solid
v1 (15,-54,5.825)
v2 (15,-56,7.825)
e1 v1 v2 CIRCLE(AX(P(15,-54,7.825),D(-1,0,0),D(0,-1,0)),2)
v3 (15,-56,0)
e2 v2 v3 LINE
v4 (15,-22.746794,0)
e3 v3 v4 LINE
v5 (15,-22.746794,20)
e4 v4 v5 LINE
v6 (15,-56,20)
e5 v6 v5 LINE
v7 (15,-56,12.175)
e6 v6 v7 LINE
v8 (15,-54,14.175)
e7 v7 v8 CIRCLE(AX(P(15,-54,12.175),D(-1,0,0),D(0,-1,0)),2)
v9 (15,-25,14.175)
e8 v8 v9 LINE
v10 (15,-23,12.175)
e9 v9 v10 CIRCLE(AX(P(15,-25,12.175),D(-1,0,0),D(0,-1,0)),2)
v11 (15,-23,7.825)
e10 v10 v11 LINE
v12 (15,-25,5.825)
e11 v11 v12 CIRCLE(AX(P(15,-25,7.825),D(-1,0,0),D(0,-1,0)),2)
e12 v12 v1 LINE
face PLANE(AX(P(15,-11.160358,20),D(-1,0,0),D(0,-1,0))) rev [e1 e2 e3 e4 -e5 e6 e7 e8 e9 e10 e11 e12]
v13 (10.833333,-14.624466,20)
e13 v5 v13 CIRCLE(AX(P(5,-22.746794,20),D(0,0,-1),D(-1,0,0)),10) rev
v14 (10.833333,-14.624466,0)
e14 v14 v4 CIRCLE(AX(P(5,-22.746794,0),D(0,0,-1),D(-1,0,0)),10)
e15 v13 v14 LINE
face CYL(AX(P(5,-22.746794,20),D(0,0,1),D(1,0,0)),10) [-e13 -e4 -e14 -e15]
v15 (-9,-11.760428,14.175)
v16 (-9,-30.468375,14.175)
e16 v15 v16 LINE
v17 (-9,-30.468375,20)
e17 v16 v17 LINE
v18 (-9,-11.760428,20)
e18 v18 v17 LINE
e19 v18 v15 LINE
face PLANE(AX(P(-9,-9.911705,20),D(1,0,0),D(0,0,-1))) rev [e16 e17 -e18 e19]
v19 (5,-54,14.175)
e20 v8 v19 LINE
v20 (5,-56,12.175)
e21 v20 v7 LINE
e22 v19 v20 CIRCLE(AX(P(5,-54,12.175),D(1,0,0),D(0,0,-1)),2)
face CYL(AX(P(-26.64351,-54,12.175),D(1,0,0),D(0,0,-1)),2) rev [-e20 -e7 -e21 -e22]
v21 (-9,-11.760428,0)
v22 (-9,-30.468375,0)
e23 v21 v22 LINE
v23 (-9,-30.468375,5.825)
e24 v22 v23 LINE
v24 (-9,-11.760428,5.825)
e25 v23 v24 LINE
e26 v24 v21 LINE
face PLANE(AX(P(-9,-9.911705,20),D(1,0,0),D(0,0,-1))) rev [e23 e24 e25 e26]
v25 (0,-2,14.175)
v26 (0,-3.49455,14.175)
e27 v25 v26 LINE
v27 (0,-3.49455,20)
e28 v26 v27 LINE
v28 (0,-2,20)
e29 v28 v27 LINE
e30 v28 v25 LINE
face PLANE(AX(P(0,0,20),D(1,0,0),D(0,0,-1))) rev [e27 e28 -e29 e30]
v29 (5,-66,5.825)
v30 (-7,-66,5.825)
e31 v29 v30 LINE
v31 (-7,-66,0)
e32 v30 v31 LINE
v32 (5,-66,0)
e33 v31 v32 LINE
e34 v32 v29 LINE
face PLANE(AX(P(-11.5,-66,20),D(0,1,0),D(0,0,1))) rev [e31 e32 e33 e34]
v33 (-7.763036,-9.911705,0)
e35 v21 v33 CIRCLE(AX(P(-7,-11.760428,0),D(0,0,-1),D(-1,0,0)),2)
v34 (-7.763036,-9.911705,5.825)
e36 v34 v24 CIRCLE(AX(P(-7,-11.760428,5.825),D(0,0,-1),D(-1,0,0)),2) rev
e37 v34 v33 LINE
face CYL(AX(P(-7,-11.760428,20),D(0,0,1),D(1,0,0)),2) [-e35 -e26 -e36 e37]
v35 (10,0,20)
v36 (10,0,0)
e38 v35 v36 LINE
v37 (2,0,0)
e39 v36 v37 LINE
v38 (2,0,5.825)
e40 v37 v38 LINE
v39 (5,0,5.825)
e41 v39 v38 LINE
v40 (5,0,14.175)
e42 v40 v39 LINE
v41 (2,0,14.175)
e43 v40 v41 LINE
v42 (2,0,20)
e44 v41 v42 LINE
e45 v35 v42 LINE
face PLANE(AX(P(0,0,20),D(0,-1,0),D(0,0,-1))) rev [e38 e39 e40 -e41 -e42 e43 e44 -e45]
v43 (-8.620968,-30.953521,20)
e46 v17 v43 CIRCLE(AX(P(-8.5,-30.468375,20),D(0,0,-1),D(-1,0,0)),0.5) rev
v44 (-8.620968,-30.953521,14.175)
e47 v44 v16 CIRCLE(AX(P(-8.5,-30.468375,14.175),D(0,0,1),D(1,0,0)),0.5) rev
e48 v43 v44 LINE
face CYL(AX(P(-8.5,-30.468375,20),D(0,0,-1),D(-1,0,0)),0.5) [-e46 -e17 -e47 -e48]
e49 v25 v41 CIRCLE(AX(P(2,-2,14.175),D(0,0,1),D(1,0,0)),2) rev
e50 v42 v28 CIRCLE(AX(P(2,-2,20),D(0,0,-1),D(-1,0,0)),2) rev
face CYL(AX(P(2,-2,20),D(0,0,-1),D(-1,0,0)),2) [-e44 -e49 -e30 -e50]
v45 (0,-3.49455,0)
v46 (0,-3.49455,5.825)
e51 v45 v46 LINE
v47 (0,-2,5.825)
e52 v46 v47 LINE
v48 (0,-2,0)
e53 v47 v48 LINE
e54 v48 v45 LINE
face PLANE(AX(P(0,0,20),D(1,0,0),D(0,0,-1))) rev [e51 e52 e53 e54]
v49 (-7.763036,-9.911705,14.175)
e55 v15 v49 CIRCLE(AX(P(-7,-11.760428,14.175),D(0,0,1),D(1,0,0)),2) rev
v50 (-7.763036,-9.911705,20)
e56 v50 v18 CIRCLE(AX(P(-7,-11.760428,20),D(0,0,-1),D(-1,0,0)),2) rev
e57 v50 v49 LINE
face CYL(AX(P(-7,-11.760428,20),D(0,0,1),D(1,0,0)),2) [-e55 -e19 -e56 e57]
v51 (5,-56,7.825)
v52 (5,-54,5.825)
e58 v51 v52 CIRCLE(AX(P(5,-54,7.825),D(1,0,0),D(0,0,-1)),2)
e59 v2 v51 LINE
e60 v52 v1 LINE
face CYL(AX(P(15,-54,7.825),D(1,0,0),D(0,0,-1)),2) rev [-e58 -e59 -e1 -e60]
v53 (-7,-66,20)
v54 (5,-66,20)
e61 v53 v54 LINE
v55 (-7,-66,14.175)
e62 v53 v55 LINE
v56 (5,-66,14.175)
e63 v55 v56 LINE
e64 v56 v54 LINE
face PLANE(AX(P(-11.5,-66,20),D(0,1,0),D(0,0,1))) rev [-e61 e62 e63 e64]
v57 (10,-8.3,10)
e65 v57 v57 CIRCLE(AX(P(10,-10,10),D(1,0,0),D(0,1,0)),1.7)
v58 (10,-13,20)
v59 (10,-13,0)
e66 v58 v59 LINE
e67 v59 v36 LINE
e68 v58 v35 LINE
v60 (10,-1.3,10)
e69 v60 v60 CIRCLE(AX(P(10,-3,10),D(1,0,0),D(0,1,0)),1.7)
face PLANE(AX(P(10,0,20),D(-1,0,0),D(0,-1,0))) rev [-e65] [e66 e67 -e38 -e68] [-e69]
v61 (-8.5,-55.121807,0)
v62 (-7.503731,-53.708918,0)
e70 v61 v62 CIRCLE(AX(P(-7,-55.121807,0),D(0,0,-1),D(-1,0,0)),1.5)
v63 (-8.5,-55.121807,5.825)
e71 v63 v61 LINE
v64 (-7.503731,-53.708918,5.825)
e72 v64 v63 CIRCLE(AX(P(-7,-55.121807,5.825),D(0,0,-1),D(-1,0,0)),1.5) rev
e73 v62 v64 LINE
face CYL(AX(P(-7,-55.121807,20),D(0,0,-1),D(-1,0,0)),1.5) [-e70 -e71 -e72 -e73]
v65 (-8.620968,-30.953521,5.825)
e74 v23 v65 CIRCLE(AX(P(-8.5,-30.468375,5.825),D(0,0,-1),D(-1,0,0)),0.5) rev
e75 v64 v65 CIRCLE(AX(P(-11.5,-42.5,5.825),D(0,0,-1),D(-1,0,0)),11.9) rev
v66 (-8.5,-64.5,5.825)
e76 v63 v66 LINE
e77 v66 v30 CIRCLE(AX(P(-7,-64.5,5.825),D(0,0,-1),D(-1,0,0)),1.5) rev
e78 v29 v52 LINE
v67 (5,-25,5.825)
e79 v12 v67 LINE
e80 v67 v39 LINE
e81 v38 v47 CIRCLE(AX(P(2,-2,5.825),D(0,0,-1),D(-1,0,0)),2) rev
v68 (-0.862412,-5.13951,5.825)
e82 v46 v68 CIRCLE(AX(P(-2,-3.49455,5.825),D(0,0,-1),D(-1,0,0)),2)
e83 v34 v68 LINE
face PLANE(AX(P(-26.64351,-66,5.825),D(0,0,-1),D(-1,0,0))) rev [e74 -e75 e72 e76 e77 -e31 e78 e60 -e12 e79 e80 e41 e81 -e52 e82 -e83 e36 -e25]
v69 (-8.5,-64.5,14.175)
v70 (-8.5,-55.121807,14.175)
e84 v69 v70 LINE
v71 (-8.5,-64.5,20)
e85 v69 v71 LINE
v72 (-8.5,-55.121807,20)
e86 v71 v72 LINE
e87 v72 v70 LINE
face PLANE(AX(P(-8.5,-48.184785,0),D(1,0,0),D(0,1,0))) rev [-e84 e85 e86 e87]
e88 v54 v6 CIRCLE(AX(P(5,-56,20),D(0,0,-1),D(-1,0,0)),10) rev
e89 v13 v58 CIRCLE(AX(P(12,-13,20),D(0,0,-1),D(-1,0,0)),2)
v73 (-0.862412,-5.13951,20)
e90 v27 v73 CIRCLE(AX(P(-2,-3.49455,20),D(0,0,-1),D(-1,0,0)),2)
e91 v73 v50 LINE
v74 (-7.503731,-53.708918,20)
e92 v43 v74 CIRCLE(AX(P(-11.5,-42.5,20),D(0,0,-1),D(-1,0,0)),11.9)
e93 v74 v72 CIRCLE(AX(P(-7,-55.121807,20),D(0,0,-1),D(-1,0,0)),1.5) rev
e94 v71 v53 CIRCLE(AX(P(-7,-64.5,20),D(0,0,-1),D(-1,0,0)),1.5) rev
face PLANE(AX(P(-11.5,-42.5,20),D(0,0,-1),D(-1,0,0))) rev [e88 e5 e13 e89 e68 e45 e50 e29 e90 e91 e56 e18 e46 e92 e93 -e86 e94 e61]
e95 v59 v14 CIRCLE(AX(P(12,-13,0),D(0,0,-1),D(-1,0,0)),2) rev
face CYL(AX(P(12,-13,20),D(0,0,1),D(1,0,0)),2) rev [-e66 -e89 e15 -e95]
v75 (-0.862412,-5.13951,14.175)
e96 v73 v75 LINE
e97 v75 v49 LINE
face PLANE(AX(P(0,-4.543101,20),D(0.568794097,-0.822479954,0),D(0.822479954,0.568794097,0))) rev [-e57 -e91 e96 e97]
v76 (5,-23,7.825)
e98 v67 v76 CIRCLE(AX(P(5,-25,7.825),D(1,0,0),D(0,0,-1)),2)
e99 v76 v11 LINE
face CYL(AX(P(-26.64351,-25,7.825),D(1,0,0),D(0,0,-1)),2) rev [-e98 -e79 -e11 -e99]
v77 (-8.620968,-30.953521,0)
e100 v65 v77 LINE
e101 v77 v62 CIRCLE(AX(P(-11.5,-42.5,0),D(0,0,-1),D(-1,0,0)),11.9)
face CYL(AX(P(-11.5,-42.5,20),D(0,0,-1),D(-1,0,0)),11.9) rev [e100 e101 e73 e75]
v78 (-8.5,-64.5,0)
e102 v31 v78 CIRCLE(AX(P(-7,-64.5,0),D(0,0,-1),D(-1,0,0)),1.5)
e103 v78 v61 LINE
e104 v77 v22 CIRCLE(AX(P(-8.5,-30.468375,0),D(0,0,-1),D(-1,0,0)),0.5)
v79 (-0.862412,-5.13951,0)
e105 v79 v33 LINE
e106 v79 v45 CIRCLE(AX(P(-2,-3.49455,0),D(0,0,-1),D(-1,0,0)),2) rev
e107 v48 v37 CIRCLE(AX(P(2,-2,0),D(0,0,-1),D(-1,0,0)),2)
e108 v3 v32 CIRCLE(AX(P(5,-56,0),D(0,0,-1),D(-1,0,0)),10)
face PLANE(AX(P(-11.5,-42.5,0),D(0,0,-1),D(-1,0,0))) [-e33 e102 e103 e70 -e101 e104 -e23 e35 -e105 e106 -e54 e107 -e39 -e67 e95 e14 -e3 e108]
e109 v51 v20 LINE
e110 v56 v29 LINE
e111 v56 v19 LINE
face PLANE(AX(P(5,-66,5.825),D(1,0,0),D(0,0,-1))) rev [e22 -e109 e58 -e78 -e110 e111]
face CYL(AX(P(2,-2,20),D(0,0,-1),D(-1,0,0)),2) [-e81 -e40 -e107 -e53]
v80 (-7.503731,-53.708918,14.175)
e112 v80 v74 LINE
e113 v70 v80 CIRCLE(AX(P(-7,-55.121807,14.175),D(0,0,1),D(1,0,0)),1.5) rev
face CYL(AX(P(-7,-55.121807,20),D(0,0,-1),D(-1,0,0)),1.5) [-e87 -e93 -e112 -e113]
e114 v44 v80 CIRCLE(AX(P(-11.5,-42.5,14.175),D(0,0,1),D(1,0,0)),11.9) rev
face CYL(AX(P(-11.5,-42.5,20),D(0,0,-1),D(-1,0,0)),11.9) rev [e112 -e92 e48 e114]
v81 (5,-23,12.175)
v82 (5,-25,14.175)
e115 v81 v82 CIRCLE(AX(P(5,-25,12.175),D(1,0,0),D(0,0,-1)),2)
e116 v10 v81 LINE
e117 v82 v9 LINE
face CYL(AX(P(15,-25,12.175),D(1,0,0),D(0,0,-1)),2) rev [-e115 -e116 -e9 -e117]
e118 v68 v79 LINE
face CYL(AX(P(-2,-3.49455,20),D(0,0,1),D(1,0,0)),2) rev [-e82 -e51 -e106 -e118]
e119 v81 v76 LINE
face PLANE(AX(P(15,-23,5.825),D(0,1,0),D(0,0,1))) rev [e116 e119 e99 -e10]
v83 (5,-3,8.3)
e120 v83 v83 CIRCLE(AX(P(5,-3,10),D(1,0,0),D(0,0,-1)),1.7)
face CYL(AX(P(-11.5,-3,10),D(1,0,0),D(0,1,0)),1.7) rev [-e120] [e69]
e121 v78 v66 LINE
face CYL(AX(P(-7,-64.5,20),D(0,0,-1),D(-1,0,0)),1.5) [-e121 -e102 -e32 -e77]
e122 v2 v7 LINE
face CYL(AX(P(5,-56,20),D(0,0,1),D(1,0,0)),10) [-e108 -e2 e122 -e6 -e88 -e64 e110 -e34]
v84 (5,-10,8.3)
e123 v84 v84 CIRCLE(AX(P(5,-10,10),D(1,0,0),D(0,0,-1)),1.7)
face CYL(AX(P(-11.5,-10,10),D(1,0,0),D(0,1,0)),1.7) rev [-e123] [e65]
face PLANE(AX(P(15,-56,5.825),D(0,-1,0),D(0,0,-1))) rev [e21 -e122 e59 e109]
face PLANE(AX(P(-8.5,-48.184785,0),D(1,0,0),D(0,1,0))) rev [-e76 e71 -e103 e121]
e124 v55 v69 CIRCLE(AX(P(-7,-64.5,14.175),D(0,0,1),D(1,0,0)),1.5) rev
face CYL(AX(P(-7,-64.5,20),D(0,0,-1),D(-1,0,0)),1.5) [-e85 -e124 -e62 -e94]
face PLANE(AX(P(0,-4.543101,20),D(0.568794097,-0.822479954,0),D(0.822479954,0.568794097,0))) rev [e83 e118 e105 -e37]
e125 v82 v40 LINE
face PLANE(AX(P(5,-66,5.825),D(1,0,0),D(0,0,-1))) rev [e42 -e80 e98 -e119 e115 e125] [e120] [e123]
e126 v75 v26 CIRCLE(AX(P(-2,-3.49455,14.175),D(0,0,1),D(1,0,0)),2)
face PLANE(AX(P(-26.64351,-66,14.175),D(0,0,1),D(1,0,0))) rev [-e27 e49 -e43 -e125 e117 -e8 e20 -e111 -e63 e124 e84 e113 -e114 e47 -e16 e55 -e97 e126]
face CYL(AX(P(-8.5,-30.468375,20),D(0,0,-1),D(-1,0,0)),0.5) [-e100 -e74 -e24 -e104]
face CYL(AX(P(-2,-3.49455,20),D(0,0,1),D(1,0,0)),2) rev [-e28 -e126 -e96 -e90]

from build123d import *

# Parameters (mm, degrees)
SKETCH_1_R          = 1.7
EXTRUDE_1_DEPTH     = 20
SKETCH_2_W          = 31.643510299
SKETCH_2_H          = 8.35
CUT_EXTRUDE_1_DEPTH = 75.850374033
SKETCH_4_R          = 1.7
CUT_EXTRUDE_3_DEPTH = 73.237455658
FILLET_1_R          = 0.5
FILLET_2_R          = 2
SKETCH_5_W          = 3.571488154
SKETCH_5_H          = 19.286036032
CUT_EXTRUDE_4_DEPTH = 75.850374033
FILLET_3_R          = 1.5
SKETCH_6_W          = 14.583576629
SKETCH_6_H          = 57.679533687
CUT_EXTRUDE_5_DEPTH = 75.850374033
FILLET_4_R          = 10
SKETCH_7_W          = 8.35
SKETCH_7_H          = 33
CUT_EXTRUDE_6_DEPTH = 71.370448485
FILLET_5_R          = 2


# Some blends are built 0.0001 mm under size
with BuildPart() as part:
    # 草图1 → 凸台-拉伸1 (new body)
    with BuildSketch(Plane.XY):
        with BuildLine():
            Line((0, 0), (10, 0))
            Line((10, 0), (10, -15))
            Line((10, -15), (29.096021943, -15))
            Line((29.096021943, -15), (29.096021943, -66))
            Line((29.096021943, -66), (-11.5, -66))
            Line((-11.5, -66), (-11.5, -54.4))
            ThreePointArc((-11.5, -54.4), (0.333421668, -43.75703287), (-9, -30.865568342))
            Line((-9, -30.865568342), (-9, -9.911704997))
            Line((-9, -9.911704997), (-7.763036189, -9.911704997))
            Line((-7.763036189, -9.911704997), (0, -4.543101007))
            Line((0, -4.543101007), (0, 0))
        make_face()
        with Locations((19.5, -30.6)):
            Circle(SKETCH_1_R, mode=Mode.SUBTRACT)
        with Locations((19.5, -56)):
            Circle(SKETCH_1_R, mode=Mode.SUBTRACT)
    extrude(amount=EXTRUDE_1_DEPTH)

    # 草图2 → 切除-拉伸1 (cut, through all)
    with BuildSketch(Plane(origin=(0, 0, 0), x_dir=(1, 0, 0), z_dir=(0, 1, 0))):
        with Locations((-10.82175515, -10)):
            Rectangle(SKETCH_2_W, SKETCH_2_H)
    extrude(amount=-CUT_EXTRUDE_1_DEPTH, mode=Mode.SUBTRACT)

    # 草图4 → 切除-拉伸3 (cut, through all)
    with BuildSketch(Plane(origin=(10, 0, 0), x_dir=(0, 0, -1), z_dir=(1, 0, 0))):
        with Locations(Location((-10, -3, 0), (0, 0, 90))):
            Circle(SKETCH_4_R)
        with Locations(Location((-10, -10, 0), (0, 0, 90))):
            Circle(SKETCH_4_R)
    extrude(amount=-CUT_EXTRUDE_3_DEPTH, mode=Mode.SUBTRACT)

    # 圆角1
    fillet_1_edges = [part.edges().sort_by_distance(p)[0] for p in [
        (-11.5, -66, 17.0875),
        (-9, -30.865568342, 17.0875),
        (-11.5, -66, 2.9125),
        (-9, -30.865568342, 2.9125),
    ]]
    fillet(fillet_1_edges, radius=FILLET_1_R)

    # 圆角2
    # the kernel refuses this fillet: 2 mm, written as the material it adds along each edge
    with BuildSketch(Plane(origin=(0, -4.543101007, 14.175), x_dir=(0, 1, 0), z_dir=(0, 0, 1)), Plane(origin=(0, -4.543101007, 0), x_dir=(0, 1, 0), z_dir=(0, 0, 1))) as fillet_2_piece_1:
        with BuildLine():
            CenterArc((FILLET_2_R * 0.524275273185, FILLET_2_R), FILLET_2_R, 214.666177241, 55.333822759)
            Line((-FILLET_2_R * 0.298204680815, FILLET_2_R * 0.431205902572), (0, 0))
            Line((0, 0), (FILLET_2_R * 0.524275273185, 0))
        make_face()
    extrude(amount=5.825)
    with BuildSketch(Plane(origin=(10, -15, 0), x_dir=(1, 0, 0), z_dir=(0, 0, 1))) as fillet_2_piece_2:
        with BuildLine():
            CenterArc((FILLET_2_R, FILLET_2_R), FILLET_2_R, 180, 90)
            Line((0, FILLET_2_R), (0, 0))
            Line((0, 0), (FILLET_2_R, 0))
        make_face()
    extrude(amount=20)
    # the kernel refuses this fillet: 2 mm, written as the material it takes off along each edge
    with BuildSketch(Plane(origin=(-9, -9.911704997, -4.621806853), x_dir=(0, -1, 0), z_dir=(0, 0, 1)), Plane(origin=(-9, -9.911704997, 9.553193147), x_dir=(0, -1, 0), z_dir=(0, 0, 1))) as fillet_2_2_piece_1:
        with BuildLine():
            CenterArc((1.848722741, 2), FILLET_2_R, 202.427748684, 67.572251316)
            Line((0, 1.236963811), (0, 0))
            Line((0, 0), (1.848722741, 0))
        make_face()
    extrude(amount=15.068613706, mode=Mode.SUBTRACT)
    with BuildSketch(Plane(origin=(0, 0, -5), x_dir=(1, 0, 0), z_dir=(0, 0, 1)), Plane(origin=(0, 0, 9.175), x_dir=(1, 0, 0), z_dir=(0, 0, 1))) as fillet_2_2_piece_2:
        with BuildLine():
            CenterArc((FILLET_2_R, -FILLET_2_R), FILLET_2_R, 90, 90)
            Line((0, -FILLET_2_R), (0, 0))
            Line((0, 0), (FILLET_2_R, 0))
        make_face()
    extrude(amount=15.825, mode=Mode.SUBTRACT)
    with BuildSketch(Plane(origin=(29.096021943, -15, -5), x_dir=(0, -1, 0), z_dir=(0, 0, 1)), Plane(origin=(29.096021943, -66, -5), x_dir=(-1, 0, 0), z_dir=(0, 0, 1))) as fillet_2_2_piece_3:
        with BuildLine():
            CenterArc((FILLET_2_R, -FILLET_2_R), FILLET_2_R, 90, 90)
            Line((0, -FILLET_2_R), (0, 0))
            Line((0, 0), (FILLET_2_R, 0))
        make_face()
    extrude(amount=30, mode=Mode.SUBTRACT)

    # 草图5 → 切除-拉伸4 (cut, through all)
    with BuildSketch(Plane.XY.offset(20)):
        with Locations((-10.285744077, -57.827803492)):
            Rectangle(SKETCH_5_W, SKETCH_5_H)
    extrude(amount=-CUT_EXTRUDE_4_DEPTH, mode=Mode.SUBTRACT)

    # 圆角3
    fillet_3_edges = [part.edges().sort_by_distance(p)[0] for p in [
        (-8.5, -54.015641537, 2.9125),
        (-8.5, -66, 2.9125),
        (-8.5, -54.015641537, 17.0875),
        (-8.5, -66, 17.0875),
    ]]
    fillet(fillet_3_edges, radius=FILLET_3_R)

    # 草图6 → 切除-拉伸5 (cut, through all)
    with BuildSketch(Plane(origin=(0, 0, 0), x_dir=(-1, 0, 0), z_dir=(0, 0, -1))):
        with Locations((-22.291788315, -40.000125123)):
            Rectangle(SKETCH_6_W, SKETCH_6_H)
    extrude(amount=-CUT_EXTRUDE_5_DEPTH, mode=Mode.SUBTRACT)

    # 圆角4
    fillet_4_edges = [part.edges().sort_by_distance(p)[0] for p in [
        (15, -66, 10),
        (15, -15, 10),
    ]]
    fillet(fillet_4_edges, radius=FILLET_4_R - 0.0001)  # a hair under: the kernel refuses the full size

    # 草图7 → 切除-拉伸6 (cut, through all)
    with BuildSketch(Plane.ZY.offset(-5)):
        with Locations((10, -39.5)):
            Rectangle(SKETCH_7_W, SKETCH_7_H)
    extrude(amount=-CUT_EXTRUDE_6_DEPTH, mode=Mode.SUBTRACT)

    # 圆角5
    fillet_5_edges = [part.edges().sort_by_distance(p)[0] for p in [
        (10, -56, 5.825),
        (10, -23, 5.825),
        (10, -23, 14.175),
        (10, -56, 14.175),
    ]]
    fillet(fillet_5_edges, radius=FILLET_5_R)


solid = part.part
